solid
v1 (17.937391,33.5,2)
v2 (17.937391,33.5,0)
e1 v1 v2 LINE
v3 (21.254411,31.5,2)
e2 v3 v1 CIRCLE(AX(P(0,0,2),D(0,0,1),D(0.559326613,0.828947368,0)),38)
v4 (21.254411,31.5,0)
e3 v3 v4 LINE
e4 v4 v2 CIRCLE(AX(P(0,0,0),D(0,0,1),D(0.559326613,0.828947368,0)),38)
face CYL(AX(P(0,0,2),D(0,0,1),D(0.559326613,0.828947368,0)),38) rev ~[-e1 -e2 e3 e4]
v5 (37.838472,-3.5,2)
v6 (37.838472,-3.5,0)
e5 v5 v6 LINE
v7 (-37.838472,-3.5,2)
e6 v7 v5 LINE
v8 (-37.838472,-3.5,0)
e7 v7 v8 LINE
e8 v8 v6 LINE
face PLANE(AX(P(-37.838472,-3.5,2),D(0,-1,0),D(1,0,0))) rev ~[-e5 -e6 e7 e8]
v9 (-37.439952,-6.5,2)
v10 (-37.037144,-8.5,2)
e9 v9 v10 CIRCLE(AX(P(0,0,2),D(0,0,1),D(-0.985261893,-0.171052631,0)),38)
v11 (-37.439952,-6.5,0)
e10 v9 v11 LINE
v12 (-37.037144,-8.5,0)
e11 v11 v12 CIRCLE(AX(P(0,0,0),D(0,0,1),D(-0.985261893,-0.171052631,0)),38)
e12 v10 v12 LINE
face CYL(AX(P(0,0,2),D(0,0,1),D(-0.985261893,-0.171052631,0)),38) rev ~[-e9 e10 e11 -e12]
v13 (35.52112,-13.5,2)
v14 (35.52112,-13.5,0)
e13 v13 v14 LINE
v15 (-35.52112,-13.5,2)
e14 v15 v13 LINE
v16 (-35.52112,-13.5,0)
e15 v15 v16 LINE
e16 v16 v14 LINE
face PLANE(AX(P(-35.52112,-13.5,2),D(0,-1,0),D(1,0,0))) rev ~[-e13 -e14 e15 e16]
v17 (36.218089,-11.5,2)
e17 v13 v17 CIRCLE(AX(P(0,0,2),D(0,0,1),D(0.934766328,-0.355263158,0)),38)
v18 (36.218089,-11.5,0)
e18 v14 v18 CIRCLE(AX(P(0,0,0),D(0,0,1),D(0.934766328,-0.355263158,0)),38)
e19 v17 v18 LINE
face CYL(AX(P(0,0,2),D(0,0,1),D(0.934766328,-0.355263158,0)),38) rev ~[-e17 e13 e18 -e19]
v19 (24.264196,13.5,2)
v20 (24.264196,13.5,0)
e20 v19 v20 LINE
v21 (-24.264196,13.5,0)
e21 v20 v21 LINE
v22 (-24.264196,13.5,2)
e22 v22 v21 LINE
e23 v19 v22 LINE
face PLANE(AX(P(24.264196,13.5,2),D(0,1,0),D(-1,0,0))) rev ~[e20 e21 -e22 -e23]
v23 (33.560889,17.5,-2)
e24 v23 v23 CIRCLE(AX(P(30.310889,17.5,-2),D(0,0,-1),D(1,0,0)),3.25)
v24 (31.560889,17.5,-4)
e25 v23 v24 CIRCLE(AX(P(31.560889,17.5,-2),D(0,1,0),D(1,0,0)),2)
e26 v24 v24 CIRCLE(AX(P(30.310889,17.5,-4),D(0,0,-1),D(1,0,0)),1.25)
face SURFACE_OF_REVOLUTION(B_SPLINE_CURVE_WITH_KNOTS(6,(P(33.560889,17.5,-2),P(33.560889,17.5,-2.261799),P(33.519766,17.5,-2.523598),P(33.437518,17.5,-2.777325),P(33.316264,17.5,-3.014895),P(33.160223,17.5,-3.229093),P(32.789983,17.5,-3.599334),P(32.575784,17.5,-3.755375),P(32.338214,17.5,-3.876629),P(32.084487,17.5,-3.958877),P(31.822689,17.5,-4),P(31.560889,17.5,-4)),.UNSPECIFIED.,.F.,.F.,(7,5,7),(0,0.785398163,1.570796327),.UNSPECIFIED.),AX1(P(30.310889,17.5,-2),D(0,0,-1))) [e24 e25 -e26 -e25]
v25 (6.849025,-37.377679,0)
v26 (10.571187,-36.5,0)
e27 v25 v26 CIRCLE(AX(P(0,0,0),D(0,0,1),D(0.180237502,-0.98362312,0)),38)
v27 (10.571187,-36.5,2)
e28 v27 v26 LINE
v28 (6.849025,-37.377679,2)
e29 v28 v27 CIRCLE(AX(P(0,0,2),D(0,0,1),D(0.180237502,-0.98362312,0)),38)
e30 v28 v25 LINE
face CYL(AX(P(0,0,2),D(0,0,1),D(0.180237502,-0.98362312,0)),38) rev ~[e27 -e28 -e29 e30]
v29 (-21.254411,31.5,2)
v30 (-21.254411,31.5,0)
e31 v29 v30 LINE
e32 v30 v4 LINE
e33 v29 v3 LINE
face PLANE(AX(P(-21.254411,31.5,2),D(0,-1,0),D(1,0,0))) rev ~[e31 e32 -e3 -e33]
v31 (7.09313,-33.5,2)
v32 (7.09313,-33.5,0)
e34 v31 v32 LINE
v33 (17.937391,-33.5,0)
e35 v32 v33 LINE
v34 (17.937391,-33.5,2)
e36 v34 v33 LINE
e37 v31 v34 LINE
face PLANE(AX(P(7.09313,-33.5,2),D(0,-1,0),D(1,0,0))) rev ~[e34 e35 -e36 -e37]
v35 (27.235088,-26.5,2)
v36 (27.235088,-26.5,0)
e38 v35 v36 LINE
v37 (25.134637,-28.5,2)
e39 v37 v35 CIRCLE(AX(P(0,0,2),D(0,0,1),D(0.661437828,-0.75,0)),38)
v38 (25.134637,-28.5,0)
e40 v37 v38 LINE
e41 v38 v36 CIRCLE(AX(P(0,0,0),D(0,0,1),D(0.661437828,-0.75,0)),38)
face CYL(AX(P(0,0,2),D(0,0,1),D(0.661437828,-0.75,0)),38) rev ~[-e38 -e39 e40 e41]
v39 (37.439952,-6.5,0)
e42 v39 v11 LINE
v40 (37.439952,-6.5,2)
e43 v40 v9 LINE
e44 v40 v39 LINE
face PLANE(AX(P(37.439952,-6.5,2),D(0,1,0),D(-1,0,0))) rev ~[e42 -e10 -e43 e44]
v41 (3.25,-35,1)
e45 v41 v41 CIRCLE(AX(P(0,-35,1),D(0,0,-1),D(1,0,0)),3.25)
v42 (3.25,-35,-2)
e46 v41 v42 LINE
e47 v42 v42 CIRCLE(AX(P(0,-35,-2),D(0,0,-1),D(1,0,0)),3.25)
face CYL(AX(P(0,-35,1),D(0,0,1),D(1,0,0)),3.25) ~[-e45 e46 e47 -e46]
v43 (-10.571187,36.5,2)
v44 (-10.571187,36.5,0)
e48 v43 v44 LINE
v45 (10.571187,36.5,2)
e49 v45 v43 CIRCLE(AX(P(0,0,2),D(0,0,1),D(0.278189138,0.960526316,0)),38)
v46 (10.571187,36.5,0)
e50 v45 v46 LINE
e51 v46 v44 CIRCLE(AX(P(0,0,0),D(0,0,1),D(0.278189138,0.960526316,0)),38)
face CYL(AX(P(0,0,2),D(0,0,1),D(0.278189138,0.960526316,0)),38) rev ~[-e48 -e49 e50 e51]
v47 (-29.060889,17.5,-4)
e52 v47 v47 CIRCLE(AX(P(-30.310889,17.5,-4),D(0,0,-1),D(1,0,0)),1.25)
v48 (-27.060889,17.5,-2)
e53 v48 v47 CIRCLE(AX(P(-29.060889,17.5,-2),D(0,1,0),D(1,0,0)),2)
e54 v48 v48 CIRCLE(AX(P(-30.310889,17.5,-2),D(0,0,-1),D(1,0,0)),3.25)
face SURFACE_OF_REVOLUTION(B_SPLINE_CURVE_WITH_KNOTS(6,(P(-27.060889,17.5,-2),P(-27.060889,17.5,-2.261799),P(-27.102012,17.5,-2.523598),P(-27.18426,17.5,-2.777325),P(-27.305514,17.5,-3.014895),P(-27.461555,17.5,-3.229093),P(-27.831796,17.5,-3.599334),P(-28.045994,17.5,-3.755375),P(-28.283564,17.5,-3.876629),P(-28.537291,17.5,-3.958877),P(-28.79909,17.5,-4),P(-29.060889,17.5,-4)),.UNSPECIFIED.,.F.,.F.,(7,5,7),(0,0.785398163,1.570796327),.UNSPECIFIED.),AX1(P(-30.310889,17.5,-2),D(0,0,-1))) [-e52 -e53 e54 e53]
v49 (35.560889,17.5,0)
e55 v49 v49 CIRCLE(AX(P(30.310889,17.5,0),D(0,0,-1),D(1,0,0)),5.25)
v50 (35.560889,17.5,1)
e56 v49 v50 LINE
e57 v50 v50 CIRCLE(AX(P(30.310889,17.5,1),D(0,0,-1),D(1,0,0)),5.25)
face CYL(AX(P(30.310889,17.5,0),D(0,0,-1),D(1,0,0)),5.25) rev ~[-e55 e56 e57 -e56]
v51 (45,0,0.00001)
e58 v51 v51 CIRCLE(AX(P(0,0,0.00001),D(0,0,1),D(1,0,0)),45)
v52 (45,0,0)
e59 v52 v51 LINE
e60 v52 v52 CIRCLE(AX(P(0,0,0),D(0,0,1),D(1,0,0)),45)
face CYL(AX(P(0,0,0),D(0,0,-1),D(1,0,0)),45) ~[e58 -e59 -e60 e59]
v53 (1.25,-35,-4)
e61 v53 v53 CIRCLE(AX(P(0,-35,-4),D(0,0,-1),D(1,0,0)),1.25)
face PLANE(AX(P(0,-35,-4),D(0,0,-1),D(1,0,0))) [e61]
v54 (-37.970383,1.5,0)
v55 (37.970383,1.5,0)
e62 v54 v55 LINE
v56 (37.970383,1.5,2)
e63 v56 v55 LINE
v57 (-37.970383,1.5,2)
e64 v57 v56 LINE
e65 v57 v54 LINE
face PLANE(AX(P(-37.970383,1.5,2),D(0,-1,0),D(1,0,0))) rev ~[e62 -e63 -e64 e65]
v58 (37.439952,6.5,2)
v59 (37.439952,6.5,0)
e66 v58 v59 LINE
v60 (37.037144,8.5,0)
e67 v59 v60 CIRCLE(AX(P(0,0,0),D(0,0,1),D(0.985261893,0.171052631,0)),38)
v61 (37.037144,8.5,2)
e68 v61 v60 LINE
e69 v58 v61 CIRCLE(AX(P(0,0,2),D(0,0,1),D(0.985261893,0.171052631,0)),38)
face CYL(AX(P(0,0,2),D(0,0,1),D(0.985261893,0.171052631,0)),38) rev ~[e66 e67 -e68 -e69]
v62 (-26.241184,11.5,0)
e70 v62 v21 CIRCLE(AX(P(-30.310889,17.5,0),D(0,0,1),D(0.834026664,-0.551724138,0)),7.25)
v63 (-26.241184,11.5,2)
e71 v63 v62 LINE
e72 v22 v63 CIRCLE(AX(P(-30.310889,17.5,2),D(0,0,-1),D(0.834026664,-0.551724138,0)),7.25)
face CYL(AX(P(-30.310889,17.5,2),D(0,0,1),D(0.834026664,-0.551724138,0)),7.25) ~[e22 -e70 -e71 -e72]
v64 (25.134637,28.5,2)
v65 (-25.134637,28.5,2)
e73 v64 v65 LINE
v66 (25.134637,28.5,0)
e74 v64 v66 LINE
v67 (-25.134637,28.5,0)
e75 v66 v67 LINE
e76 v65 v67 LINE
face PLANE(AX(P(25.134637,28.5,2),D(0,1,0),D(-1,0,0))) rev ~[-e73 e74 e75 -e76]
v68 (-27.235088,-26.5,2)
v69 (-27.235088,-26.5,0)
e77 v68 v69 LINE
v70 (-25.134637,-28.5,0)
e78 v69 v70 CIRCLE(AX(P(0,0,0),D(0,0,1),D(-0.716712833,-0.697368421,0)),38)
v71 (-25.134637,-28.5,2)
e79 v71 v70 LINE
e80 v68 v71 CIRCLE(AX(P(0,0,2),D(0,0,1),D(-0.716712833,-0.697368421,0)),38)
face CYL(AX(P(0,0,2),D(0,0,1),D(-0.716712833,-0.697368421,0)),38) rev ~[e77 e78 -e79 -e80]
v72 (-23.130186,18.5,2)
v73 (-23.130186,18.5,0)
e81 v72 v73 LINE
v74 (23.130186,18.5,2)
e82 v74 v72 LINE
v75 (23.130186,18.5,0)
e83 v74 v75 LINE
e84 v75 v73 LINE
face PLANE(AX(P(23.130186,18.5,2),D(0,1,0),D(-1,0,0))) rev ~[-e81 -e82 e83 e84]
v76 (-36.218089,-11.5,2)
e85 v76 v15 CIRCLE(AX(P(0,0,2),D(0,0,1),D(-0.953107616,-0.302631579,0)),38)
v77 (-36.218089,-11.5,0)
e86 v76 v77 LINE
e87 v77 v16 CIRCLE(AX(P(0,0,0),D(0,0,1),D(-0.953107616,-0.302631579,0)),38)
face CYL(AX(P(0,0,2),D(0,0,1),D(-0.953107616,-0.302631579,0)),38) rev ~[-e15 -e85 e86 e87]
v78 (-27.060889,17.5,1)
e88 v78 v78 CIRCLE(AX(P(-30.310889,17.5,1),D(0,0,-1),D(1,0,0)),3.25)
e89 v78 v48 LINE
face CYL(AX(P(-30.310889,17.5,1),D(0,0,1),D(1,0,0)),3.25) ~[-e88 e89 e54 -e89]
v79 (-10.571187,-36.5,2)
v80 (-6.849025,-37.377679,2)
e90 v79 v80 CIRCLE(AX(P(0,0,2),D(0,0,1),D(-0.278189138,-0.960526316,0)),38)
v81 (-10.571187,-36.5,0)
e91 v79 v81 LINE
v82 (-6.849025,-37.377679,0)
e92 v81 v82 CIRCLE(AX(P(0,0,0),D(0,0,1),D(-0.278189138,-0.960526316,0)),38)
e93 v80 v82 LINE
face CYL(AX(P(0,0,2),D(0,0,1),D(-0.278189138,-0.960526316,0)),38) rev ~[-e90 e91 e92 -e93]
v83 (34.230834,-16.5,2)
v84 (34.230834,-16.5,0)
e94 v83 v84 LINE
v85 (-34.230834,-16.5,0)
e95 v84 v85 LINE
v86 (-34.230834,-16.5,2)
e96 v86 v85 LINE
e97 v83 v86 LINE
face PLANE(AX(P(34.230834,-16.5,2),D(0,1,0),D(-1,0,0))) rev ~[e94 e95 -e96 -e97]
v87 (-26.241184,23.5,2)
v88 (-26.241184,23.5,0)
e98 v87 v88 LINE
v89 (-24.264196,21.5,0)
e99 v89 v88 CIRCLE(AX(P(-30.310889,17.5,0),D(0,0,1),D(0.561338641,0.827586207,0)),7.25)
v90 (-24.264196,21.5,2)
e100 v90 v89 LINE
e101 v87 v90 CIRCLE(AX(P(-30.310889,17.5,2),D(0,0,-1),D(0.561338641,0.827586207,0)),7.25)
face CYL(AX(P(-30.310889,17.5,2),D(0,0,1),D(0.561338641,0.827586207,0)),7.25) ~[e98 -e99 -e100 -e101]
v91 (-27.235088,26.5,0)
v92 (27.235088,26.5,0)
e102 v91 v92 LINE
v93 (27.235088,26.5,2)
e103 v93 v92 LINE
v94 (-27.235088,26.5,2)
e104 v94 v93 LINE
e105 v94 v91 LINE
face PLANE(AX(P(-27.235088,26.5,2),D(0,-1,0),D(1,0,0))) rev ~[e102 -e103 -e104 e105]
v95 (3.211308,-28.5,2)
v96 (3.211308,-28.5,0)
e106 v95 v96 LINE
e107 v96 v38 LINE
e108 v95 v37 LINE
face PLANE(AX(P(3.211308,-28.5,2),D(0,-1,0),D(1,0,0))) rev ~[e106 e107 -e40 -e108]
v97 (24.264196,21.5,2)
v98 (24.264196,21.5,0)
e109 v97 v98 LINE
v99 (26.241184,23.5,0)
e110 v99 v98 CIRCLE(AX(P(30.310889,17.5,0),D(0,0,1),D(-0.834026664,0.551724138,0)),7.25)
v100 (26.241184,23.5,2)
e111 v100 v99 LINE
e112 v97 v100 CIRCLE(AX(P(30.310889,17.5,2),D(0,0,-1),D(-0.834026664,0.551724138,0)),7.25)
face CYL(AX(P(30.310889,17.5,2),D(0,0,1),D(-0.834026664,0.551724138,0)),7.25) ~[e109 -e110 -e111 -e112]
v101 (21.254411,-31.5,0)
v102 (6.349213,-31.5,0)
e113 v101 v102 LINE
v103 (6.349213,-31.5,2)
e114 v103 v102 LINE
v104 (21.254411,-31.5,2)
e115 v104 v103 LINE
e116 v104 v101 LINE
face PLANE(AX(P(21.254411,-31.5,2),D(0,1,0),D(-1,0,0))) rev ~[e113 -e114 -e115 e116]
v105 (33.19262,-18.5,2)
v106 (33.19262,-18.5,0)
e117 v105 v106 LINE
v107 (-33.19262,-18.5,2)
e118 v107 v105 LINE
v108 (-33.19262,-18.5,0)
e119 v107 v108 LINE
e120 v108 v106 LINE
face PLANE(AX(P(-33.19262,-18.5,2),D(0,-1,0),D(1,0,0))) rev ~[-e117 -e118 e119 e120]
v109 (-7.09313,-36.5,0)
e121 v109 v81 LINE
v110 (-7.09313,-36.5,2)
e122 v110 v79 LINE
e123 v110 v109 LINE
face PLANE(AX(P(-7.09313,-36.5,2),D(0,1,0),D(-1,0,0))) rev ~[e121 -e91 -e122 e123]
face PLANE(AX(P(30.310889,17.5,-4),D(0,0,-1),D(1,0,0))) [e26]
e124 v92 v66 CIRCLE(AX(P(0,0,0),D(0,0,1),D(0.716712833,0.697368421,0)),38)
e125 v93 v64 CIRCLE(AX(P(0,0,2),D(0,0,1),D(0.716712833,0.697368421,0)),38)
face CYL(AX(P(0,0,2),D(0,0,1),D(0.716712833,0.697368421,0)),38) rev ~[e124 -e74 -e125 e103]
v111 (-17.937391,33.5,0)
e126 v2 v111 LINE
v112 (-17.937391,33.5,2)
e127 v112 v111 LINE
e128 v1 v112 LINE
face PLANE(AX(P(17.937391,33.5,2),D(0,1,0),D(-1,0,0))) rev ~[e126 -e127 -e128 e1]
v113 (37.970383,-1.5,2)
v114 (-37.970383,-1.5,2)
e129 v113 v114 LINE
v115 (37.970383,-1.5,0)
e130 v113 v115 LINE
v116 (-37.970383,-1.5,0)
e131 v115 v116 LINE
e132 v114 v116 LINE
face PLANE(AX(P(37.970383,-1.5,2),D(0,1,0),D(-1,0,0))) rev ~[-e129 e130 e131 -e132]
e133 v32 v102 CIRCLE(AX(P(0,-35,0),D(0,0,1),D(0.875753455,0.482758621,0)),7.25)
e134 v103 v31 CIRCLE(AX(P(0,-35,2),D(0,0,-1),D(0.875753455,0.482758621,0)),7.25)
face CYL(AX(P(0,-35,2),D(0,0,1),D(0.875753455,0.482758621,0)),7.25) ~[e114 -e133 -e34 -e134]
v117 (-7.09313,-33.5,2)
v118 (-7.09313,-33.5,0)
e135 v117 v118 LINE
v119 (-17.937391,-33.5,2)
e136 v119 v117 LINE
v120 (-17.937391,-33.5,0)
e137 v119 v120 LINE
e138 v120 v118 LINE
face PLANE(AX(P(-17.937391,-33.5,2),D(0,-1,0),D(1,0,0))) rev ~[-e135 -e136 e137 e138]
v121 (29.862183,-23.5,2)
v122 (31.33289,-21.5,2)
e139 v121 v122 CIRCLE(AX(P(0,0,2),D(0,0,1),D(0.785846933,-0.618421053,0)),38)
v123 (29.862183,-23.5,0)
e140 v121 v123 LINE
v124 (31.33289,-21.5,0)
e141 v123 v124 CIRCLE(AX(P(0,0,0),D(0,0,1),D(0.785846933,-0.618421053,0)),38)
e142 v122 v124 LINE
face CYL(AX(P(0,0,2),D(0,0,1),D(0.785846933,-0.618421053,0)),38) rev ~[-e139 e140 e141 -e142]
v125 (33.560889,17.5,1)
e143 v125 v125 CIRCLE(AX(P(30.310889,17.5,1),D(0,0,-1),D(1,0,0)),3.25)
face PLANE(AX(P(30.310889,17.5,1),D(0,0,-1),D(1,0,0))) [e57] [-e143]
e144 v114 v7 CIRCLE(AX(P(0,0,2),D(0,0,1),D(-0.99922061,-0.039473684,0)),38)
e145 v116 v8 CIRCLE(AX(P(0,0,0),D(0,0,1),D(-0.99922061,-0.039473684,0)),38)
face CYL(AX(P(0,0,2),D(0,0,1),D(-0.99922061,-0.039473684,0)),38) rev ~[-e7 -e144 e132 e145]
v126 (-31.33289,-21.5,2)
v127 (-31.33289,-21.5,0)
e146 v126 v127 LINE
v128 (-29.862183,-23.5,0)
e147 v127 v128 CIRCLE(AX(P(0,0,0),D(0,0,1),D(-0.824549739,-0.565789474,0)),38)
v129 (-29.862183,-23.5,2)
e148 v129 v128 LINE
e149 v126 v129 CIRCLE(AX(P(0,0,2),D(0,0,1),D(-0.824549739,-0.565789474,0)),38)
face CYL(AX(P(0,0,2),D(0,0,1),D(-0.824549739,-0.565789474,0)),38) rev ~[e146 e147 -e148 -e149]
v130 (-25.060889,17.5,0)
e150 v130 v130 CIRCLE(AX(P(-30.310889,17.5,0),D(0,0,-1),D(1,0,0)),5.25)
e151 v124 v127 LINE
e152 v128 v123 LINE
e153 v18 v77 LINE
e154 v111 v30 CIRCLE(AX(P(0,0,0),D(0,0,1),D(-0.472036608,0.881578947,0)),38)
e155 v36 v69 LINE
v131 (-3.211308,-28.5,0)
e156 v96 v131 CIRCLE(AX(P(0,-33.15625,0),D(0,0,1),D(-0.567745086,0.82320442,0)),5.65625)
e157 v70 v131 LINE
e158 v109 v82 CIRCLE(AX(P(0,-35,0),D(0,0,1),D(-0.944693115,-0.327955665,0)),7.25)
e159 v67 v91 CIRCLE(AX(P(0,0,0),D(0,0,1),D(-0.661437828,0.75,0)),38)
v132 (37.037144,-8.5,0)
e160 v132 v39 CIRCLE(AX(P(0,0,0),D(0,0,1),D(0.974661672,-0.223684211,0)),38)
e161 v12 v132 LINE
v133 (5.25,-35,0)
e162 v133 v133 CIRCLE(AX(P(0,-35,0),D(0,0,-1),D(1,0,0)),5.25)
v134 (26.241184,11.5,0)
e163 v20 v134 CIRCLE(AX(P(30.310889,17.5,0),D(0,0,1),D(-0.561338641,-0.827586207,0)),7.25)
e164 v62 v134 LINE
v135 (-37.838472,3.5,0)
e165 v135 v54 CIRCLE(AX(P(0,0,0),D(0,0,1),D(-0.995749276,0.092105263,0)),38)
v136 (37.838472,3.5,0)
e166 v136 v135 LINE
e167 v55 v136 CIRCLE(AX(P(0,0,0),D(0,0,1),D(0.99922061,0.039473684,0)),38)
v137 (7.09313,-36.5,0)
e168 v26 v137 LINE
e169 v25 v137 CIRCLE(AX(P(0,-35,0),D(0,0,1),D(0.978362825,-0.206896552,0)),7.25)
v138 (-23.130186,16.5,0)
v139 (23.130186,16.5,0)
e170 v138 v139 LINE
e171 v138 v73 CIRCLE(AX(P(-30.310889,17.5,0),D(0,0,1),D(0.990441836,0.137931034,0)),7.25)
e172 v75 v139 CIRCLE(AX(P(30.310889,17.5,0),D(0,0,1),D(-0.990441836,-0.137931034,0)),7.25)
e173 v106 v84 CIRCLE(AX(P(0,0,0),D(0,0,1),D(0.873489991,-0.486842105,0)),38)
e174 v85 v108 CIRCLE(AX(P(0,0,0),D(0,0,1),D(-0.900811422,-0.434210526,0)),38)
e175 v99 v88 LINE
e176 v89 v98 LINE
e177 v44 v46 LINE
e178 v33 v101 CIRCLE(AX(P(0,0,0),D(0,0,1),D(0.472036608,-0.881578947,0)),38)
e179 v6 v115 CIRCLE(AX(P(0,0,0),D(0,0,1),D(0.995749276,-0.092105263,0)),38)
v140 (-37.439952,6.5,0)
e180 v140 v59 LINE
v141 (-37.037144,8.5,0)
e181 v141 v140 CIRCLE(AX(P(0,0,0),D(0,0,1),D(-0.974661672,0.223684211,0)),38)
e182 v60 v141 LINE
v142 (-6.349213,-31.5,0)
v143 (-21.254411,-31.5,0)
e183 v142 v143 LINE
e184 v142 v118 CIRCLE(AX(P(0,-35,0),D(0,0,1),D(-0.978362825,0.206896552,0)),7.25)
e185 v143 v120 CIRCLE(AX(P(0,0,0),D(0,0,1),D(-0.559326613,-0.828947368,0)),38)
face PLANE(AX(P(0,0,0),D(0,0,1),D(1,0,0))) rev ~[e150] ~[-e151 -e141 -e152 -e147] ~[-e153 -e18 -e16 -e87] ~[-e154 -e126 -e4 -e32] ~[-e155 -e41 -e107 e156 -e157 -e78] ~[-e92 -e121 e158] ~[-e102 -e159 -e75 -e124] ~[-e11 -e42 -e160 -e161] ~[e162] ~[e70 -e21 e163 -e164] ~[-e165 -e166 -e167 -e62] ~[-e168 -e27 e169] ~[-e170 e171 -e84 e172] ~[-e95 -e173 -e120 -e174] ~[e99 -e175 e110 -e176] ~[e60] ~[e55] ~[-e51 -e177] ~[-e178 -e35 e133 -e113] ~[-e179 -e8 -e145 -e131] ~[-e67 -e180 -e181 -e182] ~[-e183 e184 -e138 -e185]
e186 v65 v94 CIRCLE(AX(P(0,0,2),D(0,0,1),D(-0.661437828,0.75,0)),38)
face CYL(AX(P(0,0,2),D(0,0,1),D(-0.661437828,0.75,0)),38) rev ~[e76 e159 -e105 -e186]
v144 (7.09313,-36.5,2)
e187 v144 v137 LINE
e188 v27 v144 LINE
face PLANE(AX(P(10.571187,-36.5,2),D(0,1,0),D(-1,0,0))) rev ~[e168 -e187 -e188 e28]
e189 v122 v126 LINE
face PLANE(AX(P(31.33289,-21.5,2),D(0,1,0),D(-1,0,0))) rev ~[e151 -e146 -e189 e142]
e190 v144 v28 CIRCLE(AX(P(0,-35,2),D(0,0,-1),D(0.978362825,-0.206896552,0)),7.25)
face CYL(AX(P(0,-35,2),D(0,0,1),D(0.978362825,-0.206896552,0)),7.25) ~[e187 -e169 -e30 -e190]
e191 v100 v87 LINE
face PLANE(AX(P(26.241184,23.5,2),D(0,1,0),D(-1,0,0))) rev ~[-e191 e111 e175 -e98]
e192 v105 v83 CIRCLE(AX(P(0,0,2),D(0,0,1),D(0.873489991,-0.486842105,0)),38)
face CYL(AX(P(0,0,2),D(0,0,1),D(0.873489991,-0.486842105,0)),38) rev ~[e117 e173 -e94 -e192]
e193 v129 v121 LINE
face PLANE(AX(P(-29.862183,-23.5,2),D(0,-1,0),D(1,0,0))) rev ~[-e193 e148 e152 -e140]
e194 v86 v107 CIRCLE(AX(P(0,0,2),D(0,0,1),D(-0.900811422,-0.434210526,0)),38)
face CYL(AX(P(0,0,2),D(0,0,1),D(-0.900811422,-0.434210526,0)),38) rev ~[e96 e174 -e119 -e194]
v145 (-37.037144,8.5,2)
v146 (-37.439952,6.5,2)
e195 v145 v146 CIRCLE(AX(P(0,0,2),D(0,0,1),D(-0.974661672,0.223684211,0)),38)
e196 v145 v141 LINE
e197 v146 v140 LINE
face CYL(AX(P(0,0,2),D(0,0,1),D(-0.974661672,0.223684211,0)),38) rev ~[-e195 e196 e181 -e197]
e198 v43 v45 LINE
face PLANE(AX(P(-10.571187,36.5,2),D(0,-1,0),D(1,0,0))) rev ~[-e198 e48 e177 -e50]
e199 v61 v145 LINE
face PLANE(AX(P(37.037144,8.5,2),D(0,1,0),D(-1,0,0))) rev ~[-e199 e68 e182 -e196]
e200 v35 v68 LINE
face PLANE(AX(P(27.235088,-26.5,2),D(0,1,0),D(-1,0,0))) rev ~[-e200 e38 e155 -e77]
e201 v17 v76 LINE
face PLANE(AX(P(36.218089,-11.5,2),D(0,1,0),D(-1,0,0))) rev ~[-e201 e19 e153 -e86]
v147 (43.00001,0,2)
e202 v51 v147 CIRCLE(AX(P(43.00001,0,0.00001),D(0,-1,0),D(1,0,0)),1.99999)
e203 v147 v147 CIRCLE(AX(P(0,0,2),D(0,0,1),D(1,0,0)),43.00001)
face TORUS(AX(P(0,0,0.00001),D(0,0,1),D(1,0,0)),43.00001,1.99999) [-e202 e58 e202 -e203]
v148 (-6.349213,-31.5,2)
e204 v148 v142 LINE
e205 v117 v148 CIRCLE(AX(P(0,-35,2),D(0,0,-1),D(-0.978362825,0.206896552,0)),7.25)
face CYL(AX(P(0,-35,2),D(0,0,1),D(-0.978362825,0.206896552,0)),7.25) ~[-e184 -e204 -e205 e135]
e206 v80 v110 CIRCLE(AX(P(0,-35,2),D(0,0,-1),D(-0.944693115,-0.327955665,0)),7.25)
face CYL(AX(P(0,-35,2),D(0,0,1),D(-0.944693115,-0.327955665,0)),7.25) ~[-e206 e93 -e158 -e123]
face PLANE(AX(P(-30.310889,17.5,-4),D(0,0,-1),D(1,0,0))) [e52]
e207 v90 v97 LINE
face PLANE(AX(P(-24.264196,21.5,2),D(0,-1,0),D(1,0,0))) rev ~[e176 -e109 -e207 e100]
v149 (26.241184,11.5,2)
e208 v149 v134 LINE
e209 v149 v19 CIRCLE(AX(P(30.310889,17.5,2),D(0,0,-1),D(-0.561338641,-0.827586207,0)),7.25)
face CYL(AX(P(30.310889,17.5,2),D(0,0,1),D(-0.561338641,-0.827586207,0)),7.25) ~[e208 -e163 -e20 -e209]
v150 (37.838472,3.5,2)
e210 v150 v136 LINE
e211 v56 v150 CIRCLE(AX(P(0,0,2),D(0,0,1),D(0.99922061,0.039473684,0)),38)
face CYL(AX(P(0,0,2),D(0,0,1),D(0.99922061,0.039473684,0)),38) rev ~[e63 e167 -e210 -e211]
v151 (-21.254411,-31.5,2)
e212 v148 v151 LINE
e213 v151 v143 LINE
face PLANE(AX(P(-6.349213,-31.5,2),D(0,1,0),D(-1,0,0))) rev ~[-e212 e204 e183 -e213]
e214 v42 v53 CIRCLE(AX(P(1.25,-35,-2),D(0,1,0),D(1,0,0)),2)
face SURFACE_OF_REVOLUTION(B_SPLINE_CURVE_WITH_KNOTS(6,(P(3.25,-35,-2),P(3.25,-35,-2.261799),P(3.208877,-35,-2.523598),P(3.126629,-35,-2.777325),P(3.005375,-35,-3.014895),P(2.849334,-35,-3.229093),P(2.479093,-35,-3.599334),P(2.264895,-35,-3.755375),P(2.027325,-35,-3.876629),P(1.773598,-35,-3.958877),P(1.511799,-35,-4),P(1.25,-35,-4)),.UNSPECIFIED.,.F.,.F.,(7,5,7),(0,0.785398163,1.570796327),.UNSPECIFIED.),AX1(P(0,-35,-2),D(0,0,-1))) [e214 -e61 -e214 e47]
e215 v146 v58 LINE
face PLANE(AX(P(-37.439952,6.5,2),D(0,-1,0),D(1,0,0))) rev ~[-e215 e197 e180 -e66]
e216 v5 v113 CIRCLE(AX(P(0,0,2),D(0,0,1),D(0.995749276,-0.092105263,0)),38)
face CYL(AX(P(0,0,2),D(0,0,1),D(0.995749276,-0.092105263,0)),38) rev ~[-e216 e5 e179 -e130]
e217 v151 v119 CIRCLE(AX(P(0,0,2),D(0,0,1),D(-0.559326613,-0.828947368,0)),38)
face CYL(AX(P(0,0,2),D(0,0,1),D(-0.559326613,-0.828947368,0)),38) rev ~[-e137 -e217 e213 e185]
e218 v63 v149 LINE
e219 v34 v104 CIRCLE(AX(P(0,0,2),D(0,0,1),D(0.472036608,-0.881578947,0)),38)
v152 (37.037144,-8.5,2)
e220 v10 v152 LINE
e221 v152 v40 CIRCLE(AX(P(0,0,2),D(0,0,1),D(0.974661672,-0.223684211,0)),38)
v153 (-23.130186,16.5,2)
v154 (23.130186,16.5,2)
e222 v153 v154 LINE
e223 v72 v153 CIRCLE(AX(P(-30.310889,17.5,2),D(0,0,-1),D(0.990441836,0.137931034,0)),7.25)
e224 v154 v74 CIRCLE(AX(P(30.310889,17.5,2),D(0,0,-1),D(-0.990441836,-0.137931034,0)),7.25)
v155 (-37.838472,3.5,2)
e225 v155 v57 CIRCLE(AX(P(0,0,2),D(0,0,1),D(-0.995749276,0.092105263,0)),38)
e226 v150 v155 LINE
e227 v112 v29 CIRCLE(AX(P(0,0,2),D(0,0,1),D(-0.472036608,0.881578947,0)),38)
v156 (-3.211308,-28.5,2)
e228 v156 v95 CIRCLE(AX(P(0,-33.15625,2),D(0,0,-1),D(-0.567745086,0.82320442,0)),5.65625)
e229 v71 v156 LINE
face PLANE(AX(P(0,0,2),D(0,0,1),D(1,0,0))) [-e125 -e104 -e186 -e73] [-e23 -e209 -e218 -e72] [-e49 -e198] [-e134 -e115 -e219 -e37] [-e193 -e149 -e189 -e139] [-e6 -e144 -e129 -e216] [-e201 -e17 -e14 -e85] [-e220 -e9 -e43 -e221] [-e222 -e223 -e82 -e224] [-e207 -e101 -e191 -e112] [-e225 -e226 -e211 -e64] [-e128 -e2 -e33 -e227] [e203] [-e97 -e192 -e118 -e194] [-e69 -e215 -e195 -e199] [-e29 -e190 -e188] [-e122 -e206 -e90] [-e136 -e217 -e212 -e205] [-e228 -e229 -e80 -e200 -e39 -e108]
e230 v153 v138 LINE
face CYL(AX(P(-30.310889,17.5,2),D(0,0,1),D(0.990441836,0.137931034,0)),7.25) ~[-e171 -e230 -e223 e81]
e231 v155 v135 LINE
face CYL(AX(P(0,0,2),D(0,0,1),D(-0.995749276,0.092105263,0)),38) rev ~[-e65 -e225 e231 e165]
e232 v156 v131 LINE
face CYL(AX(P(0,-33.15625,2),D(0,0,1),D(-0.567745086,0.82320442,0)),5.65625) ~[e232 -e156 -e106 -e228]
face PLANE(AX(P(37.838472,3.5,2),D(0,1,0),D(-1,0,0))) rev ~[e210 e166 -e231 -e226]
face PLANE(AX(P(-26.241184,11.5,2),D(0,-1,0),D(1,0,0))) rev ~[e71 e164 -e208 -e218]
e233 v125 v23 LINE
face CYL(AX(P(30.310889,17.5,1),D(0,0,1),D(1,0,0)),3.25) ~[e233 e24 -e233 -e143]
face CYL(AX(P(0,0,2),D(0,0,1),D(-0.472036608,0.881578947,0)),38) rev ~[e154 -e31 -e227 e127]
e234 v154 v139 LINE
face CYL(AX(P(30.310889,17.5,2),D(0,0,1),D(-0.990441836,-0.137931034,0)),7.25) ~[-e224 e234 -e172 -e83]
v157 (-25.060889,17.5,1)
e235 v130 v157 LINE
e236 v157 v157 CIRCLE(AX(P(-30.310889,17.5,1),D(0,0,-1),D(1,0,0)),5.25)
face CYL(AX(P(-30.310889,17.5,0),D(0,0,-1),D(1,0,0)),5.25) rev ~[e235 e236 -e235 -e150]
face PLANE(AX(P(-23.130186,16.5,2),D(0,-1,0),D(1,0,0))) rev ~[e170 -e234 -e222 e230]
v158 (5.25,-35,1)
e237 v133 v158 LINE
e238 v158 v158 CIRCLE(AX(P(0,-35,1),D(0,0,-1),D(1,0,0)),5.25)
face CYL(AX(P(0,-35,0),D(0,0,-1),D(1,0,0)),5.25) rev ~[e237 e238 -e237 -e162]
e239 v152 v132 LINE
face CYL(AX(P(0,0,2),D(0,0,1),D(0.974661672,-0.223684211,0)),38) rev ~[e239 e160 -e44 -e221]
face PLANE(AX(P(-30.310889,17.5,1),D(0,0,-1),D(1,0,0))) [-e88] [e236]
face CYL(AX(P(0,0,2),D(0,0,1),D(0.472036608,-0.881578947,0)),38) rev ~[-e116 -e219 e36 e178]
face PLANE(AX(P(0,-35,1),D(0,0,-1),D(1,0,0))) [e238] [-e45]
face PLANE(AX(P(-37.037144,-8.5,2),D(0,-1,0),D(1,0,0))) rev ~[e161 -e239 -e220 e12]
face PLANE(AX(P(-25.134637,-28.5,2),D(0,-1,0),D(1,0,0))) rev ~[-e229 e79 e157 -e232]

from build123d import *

# Parameters (mm, degrees)
F0_R     = 45
F1_DEPTH = 2
F2_R     = 5.25
F3_DEPTH = 1
F4_R     = 3.25
F5_DEPTH = 5
F6_R     = 2
F7_R     = 1.99999
F9_DEPTH = 25


# Not quite as in the source:
# - a fillet or chamfer is up to 0.001 mm smaller than in the source, because OpenCascade refuses the exact size


with BuildPart() as f1:
    # F0 (on Top) → F1 (new body)
    with BuildSketch(Plane.XY):
        Circle(F0_R)
    extrude(amount=F1_DEPTH)

    # F2 (on face) → F3 (cut)
    with BuildSketch(Plane(origin=(0, 0, 0), x_dir=(1, 0, 0), z_dir=(0, 0, -1))):
        with Locations((0, 35)):
            Circle(F2_R)
        with Locations((-30.3108891325, -17.5)):
            Circle(F2_R)
        with Locations((30.3108891325, -17.5)):
            Circle(F2_R)
    extrude(amount=-F3_DEPTH, mode=Mode.SUBTRACT)

    # F4 (on face) → F5 (join)
    with BuildSketch(Plane(origin=(0, 0, 1), x_dir=(1, 0, 0), z_dir=(0, 0, -1))):
        with Locations((0, 35)):
            Circle(F4_R)
        with Locations((30.3108891325, -17.5)):
            Circle(F4_R)
        with Locations((-30.3108891325, -17.5)):
            Circle(F4_R)
    extrude(amount=F5_DEPTH)

    # F6
    f6_edges = [f1.edges().sort_by_distance(p)[0] for p in [
        (-33.560889, 17.5, -4),
        (-3.25, -35, -4),
        (27.060889, 17.5, -4),
    ]]
    fillet(f6_edges, radius=F6_R)

    # F7 (radius 2 in the source; OpenCascade refuses exactly that, so slightly less here)
    f7_edges = [f1.edges().sort_by_distance(p)[0] for p in [
        (-45, 0, 2),
    ]]
    fillet(f7_edges, radius=F7_R)

    # F8 (on face) → F9 (cut)
    with BuildSketch(Plane.XY.offset(2)):
        with BuildLine():
            Line((17.9373911147, 33.5), (-17.9373911147, 33.5))
            ThreePointArc((-17.9373911147, 33.5), (-19.6214001606, 32.5422902657), (-21.2544113068, 31.5))
            Line((-21.2544113068, 31.5), (21.2544113068, 31.5))
            ThreePointArc((21.2544113068, 31.5), (19.6214001606, 32.5422902657), (17.9373911147, 33.5))
        make_face()
        with BuildLine():
            Line((-7.0931304796, -36.5), (-10.5711872559, -36.5))
            ThreePointArc((-10.5711872559, -36.5), (-8.7211541333, -36.9856927823), (-6.8490250847, -37.3776785714))
            ThreePointArc((-6.8490250847, -37.3776785714), (-6.9848769039, -36.9426771829), (-7.0931304796, -36.5))
        make_face()
        with BuildLine():
            ThreePointArc((-21.2544113068, -31.5), (-19.6214001606, -32.5422902657), (-17.9373911147, -33.5))
            Line((-17.9373911147, -33.5), (-7.0931304796, -33.5))
            ThreePointArc((-7.0931304796, -33.5), (-6.7951561077, -32.4724807673), (-6.3492125496, -31.5))
            Line((-6.3492125496, -31.5), (-21.2544113068, -31.5))
        make_face()
        with BuildLine():
            ThreePointArc((-27.2350876628, -26.5), (-26.2039506035, -27.5200467436), (-25.1346374551, -28.5))
            Line((-25.1346374551, -28.5), (-3.2113081447, -28.5))
            ThreePointArc((-3.2113081447, -28.5), (0, -27.5), (3.2113081447, -28.5))
            Line((3.2113081447, -28.5), (25.1346374551, -28.5))
            ThreePointArc((25.1346374551, -28.5), (26.2039506035, -27.5200467436), (27.2350876628, -26.5))
            Line((27.2350876628, -26.5), (-27.2350876628, -26.5))
        make_face()
        with BuildLine():
            ThreePointArc((-31.3328900678, -21.5), (-30.6138735789, -22.5120133372), (-29.8621834433, -23.5))
            Line((-29.8621834433, -23.5), (29.8621834433, -23.5))
            ThreePointArc((29.8621834433, -23.5), (30.6138735789, -22.5120133372), (31.3328900678, -21.5))
            Line((31.3328900678, -21.5), (-31.3328900678, -21.5))
        make_face()
        with BuildLine():
            ThreePointArc((-34.2308340535, -16.5), (-33.7265552305, -17.5076975151), (-33.1926196616, -18.5))
            Line((-33.1926196616, -18.5), (33.1926196616, -18.5))
            ThreePointArc((33.1926196616, -18.5), (33.7265552305, -17.5076975151), (34.2308340535, -16.5))
            Line((34.2308340535, -16.5), (-34.2308340535, -16.5))
        make_face()
        with BuildLine():
            ThreePointArc((-36.2180894029, -11.5), (-35.8835416114, -12.5048567133), (-35.5211204778, -13.5))
            Line((-35.5211204778, -13.5), (35.5211204778, -13.5))
            ThreePointArc((35.5211204778, -13.5), (35.8835416114, -12.5048567133), (36.2180894029, -11.5))
            Line((36.2180894029, -11.5), (-36.2180894029, -11.5))
        make_face()
        with BuildLine():
            ThreePointArc((-37.439951923, -6.5), (-37.2519722478, -7.5027037562), (-37.0371435184, -8.5))
            Line((-37.0371435184, -8.5), (37.0371435184, -8.5))
            ThreePointArc((37.0371435184, -8.5), (37.2519722478, -7.5027037562), (37.439951923, -6.5))
            Line((37.439951923, -6.5), (-37.439951923, -6.5))
        make_face()
        with BuildLine():
            ThreePointArc((-37.9703831953, -1.5), (-37.9176166167, -2.5008698704), (-37.838472485, -3.5))
            Line((-37.838472485, -3.5), (37.838472485, -3.5))
            ThreePointArc((37.838472485, -3.5), (37.9176166167, -2.5008698704), (37.9703831953, -1.5))
            Line((37.9703831953, -1.5), (-37.9703831953, -1.5))
        make_face()
        with BuildLine():
            ThreePointArc((-37.838472485, 3.5), (-37.9176166167, 2.5008698704), (-37.9703831953, 1.5))
            Line((-37.9703831953, 1.5), (37.9703831953, 1.5))
            ThreePointArc((37.9703831953, 1.5), (37.9176166167, 2.5008698704), (37.838472485, 3.5))
            Line((37.838472485, 3.5), (-37.838472485, 3.5))
        make_face()
        with BuildLine():
            ThreePointArc((-37.0371435184, 8.5), (-37.2519722478, 7.5027037562), (-37.439951923, 6.5))
            Line((-37.439951923, 6.5), (37.439951923, 6.5))
            ThreePointArc((37.439951923, 6.5), (37.2519722478, 7.5027037562), (37.0371435184, 8.5))
            Line((37.0371435184, 8.5), (-37.0371435184, 8.5))
        make_face()
        with BuildLine():
            Line((24.2641958212, 13.5), (-24.2641958212, 13.5))
            ThreePointArc((-24.2641958212, 13.5), (-25.1547879454, 12.403224495), (-26.2411839834, 11.5))
            Line((-26.2411839834, 11.5), (26.2411839834, 11.5))
            ThreePointArc((26.2411839834, 11.5), (25.1547879454, 12.403224495), (24.2641958212, 13.5))
        make_face()
        with BuildLine():
            ThreePointArc((-23.1301858243, 18.5), (-23.0608891325, 17.5), (-23.1301858243, 16.5))
            Line((-23.1301858243, 16.5), (23.1301858243, 16.5))
            ThreePointArc((23.1301858243, 16.5), (23.0608891325, 17.5), (23.1301858243, 18.5))
            Line((23.1301858243, 18.5), (-23.1301858243, 18.5))
        make_face()
        with BuildLine():
            ThreePointArc((-26.2411839834, 23.5), (-25.1547879454, 22.596775505), (-24.2641958212, 21.5))
            Line((-24.2641958212, 21.5), (24.2641958212, 21.5))
            ThreePointArc((24.2641958212, 21.5), (25.1547879454, 22.596775505), (26.2411839834, 23.5))
            Line((26.2411839834, 23.5), (-26.2411839834, 23.5))
        make_face()
        with BuildLine():
            ThreePointArc((-25.1346374551, 28.5), (-26.2039506035, 27.5200467436), (-27.2350876628, 26.5))
            Line((-27.2350876628, 26.5), (27.2350876628, 26.5))
            ThreePointArc((27.2350876628, 26.5), (26.2039506035, 27.5200467436), (25.1346374551, 28.5))
            Line((25.1346374551, 28.5), (-25.1346374551, 28.5))
        make_face()
        with BuildLine():
            ThreePointArc((10.5711872559, 36.5), (0, 38), (-10.5711872559, 36.5))
            Line((-10.5711872559, 36.5), (10.5711872559, 36.5))
        make_face()
        with BuildLine():
            Line((7.0931304796, -33.5), (17.9373911147, -33.5))
            ThreePointArc((17.9373911147, -33.5), (19.6214001606, -32.5422902657), (21.2544113068, -31.5))
            Line((21.2544113068, -31.5), (6.3492125496, -31.5))
            ThreePointArc((6.3492125496, -31.5), (6.7951561077, -32.4724807673), (7.0931304796, -33.5))
        make_face()
        with BuildLine():
            Line((10.5711872559, -36.5), (7.0931304796, -36.5))
            ThreePointArc((7.0931304796, -36.5), (6.9848769039, -36.9426771829), (6.8490250847, -37.3776785714))
            ThreePointArc((6.8490250847, -37.3776785714), (8.7211541333, -36.9856927823), (10.5711872559, -36.5))
        make_face()
    extrude(amount=-F9_DEPTH, mode=Mode.SUBTRACT)


solid = f1.part
